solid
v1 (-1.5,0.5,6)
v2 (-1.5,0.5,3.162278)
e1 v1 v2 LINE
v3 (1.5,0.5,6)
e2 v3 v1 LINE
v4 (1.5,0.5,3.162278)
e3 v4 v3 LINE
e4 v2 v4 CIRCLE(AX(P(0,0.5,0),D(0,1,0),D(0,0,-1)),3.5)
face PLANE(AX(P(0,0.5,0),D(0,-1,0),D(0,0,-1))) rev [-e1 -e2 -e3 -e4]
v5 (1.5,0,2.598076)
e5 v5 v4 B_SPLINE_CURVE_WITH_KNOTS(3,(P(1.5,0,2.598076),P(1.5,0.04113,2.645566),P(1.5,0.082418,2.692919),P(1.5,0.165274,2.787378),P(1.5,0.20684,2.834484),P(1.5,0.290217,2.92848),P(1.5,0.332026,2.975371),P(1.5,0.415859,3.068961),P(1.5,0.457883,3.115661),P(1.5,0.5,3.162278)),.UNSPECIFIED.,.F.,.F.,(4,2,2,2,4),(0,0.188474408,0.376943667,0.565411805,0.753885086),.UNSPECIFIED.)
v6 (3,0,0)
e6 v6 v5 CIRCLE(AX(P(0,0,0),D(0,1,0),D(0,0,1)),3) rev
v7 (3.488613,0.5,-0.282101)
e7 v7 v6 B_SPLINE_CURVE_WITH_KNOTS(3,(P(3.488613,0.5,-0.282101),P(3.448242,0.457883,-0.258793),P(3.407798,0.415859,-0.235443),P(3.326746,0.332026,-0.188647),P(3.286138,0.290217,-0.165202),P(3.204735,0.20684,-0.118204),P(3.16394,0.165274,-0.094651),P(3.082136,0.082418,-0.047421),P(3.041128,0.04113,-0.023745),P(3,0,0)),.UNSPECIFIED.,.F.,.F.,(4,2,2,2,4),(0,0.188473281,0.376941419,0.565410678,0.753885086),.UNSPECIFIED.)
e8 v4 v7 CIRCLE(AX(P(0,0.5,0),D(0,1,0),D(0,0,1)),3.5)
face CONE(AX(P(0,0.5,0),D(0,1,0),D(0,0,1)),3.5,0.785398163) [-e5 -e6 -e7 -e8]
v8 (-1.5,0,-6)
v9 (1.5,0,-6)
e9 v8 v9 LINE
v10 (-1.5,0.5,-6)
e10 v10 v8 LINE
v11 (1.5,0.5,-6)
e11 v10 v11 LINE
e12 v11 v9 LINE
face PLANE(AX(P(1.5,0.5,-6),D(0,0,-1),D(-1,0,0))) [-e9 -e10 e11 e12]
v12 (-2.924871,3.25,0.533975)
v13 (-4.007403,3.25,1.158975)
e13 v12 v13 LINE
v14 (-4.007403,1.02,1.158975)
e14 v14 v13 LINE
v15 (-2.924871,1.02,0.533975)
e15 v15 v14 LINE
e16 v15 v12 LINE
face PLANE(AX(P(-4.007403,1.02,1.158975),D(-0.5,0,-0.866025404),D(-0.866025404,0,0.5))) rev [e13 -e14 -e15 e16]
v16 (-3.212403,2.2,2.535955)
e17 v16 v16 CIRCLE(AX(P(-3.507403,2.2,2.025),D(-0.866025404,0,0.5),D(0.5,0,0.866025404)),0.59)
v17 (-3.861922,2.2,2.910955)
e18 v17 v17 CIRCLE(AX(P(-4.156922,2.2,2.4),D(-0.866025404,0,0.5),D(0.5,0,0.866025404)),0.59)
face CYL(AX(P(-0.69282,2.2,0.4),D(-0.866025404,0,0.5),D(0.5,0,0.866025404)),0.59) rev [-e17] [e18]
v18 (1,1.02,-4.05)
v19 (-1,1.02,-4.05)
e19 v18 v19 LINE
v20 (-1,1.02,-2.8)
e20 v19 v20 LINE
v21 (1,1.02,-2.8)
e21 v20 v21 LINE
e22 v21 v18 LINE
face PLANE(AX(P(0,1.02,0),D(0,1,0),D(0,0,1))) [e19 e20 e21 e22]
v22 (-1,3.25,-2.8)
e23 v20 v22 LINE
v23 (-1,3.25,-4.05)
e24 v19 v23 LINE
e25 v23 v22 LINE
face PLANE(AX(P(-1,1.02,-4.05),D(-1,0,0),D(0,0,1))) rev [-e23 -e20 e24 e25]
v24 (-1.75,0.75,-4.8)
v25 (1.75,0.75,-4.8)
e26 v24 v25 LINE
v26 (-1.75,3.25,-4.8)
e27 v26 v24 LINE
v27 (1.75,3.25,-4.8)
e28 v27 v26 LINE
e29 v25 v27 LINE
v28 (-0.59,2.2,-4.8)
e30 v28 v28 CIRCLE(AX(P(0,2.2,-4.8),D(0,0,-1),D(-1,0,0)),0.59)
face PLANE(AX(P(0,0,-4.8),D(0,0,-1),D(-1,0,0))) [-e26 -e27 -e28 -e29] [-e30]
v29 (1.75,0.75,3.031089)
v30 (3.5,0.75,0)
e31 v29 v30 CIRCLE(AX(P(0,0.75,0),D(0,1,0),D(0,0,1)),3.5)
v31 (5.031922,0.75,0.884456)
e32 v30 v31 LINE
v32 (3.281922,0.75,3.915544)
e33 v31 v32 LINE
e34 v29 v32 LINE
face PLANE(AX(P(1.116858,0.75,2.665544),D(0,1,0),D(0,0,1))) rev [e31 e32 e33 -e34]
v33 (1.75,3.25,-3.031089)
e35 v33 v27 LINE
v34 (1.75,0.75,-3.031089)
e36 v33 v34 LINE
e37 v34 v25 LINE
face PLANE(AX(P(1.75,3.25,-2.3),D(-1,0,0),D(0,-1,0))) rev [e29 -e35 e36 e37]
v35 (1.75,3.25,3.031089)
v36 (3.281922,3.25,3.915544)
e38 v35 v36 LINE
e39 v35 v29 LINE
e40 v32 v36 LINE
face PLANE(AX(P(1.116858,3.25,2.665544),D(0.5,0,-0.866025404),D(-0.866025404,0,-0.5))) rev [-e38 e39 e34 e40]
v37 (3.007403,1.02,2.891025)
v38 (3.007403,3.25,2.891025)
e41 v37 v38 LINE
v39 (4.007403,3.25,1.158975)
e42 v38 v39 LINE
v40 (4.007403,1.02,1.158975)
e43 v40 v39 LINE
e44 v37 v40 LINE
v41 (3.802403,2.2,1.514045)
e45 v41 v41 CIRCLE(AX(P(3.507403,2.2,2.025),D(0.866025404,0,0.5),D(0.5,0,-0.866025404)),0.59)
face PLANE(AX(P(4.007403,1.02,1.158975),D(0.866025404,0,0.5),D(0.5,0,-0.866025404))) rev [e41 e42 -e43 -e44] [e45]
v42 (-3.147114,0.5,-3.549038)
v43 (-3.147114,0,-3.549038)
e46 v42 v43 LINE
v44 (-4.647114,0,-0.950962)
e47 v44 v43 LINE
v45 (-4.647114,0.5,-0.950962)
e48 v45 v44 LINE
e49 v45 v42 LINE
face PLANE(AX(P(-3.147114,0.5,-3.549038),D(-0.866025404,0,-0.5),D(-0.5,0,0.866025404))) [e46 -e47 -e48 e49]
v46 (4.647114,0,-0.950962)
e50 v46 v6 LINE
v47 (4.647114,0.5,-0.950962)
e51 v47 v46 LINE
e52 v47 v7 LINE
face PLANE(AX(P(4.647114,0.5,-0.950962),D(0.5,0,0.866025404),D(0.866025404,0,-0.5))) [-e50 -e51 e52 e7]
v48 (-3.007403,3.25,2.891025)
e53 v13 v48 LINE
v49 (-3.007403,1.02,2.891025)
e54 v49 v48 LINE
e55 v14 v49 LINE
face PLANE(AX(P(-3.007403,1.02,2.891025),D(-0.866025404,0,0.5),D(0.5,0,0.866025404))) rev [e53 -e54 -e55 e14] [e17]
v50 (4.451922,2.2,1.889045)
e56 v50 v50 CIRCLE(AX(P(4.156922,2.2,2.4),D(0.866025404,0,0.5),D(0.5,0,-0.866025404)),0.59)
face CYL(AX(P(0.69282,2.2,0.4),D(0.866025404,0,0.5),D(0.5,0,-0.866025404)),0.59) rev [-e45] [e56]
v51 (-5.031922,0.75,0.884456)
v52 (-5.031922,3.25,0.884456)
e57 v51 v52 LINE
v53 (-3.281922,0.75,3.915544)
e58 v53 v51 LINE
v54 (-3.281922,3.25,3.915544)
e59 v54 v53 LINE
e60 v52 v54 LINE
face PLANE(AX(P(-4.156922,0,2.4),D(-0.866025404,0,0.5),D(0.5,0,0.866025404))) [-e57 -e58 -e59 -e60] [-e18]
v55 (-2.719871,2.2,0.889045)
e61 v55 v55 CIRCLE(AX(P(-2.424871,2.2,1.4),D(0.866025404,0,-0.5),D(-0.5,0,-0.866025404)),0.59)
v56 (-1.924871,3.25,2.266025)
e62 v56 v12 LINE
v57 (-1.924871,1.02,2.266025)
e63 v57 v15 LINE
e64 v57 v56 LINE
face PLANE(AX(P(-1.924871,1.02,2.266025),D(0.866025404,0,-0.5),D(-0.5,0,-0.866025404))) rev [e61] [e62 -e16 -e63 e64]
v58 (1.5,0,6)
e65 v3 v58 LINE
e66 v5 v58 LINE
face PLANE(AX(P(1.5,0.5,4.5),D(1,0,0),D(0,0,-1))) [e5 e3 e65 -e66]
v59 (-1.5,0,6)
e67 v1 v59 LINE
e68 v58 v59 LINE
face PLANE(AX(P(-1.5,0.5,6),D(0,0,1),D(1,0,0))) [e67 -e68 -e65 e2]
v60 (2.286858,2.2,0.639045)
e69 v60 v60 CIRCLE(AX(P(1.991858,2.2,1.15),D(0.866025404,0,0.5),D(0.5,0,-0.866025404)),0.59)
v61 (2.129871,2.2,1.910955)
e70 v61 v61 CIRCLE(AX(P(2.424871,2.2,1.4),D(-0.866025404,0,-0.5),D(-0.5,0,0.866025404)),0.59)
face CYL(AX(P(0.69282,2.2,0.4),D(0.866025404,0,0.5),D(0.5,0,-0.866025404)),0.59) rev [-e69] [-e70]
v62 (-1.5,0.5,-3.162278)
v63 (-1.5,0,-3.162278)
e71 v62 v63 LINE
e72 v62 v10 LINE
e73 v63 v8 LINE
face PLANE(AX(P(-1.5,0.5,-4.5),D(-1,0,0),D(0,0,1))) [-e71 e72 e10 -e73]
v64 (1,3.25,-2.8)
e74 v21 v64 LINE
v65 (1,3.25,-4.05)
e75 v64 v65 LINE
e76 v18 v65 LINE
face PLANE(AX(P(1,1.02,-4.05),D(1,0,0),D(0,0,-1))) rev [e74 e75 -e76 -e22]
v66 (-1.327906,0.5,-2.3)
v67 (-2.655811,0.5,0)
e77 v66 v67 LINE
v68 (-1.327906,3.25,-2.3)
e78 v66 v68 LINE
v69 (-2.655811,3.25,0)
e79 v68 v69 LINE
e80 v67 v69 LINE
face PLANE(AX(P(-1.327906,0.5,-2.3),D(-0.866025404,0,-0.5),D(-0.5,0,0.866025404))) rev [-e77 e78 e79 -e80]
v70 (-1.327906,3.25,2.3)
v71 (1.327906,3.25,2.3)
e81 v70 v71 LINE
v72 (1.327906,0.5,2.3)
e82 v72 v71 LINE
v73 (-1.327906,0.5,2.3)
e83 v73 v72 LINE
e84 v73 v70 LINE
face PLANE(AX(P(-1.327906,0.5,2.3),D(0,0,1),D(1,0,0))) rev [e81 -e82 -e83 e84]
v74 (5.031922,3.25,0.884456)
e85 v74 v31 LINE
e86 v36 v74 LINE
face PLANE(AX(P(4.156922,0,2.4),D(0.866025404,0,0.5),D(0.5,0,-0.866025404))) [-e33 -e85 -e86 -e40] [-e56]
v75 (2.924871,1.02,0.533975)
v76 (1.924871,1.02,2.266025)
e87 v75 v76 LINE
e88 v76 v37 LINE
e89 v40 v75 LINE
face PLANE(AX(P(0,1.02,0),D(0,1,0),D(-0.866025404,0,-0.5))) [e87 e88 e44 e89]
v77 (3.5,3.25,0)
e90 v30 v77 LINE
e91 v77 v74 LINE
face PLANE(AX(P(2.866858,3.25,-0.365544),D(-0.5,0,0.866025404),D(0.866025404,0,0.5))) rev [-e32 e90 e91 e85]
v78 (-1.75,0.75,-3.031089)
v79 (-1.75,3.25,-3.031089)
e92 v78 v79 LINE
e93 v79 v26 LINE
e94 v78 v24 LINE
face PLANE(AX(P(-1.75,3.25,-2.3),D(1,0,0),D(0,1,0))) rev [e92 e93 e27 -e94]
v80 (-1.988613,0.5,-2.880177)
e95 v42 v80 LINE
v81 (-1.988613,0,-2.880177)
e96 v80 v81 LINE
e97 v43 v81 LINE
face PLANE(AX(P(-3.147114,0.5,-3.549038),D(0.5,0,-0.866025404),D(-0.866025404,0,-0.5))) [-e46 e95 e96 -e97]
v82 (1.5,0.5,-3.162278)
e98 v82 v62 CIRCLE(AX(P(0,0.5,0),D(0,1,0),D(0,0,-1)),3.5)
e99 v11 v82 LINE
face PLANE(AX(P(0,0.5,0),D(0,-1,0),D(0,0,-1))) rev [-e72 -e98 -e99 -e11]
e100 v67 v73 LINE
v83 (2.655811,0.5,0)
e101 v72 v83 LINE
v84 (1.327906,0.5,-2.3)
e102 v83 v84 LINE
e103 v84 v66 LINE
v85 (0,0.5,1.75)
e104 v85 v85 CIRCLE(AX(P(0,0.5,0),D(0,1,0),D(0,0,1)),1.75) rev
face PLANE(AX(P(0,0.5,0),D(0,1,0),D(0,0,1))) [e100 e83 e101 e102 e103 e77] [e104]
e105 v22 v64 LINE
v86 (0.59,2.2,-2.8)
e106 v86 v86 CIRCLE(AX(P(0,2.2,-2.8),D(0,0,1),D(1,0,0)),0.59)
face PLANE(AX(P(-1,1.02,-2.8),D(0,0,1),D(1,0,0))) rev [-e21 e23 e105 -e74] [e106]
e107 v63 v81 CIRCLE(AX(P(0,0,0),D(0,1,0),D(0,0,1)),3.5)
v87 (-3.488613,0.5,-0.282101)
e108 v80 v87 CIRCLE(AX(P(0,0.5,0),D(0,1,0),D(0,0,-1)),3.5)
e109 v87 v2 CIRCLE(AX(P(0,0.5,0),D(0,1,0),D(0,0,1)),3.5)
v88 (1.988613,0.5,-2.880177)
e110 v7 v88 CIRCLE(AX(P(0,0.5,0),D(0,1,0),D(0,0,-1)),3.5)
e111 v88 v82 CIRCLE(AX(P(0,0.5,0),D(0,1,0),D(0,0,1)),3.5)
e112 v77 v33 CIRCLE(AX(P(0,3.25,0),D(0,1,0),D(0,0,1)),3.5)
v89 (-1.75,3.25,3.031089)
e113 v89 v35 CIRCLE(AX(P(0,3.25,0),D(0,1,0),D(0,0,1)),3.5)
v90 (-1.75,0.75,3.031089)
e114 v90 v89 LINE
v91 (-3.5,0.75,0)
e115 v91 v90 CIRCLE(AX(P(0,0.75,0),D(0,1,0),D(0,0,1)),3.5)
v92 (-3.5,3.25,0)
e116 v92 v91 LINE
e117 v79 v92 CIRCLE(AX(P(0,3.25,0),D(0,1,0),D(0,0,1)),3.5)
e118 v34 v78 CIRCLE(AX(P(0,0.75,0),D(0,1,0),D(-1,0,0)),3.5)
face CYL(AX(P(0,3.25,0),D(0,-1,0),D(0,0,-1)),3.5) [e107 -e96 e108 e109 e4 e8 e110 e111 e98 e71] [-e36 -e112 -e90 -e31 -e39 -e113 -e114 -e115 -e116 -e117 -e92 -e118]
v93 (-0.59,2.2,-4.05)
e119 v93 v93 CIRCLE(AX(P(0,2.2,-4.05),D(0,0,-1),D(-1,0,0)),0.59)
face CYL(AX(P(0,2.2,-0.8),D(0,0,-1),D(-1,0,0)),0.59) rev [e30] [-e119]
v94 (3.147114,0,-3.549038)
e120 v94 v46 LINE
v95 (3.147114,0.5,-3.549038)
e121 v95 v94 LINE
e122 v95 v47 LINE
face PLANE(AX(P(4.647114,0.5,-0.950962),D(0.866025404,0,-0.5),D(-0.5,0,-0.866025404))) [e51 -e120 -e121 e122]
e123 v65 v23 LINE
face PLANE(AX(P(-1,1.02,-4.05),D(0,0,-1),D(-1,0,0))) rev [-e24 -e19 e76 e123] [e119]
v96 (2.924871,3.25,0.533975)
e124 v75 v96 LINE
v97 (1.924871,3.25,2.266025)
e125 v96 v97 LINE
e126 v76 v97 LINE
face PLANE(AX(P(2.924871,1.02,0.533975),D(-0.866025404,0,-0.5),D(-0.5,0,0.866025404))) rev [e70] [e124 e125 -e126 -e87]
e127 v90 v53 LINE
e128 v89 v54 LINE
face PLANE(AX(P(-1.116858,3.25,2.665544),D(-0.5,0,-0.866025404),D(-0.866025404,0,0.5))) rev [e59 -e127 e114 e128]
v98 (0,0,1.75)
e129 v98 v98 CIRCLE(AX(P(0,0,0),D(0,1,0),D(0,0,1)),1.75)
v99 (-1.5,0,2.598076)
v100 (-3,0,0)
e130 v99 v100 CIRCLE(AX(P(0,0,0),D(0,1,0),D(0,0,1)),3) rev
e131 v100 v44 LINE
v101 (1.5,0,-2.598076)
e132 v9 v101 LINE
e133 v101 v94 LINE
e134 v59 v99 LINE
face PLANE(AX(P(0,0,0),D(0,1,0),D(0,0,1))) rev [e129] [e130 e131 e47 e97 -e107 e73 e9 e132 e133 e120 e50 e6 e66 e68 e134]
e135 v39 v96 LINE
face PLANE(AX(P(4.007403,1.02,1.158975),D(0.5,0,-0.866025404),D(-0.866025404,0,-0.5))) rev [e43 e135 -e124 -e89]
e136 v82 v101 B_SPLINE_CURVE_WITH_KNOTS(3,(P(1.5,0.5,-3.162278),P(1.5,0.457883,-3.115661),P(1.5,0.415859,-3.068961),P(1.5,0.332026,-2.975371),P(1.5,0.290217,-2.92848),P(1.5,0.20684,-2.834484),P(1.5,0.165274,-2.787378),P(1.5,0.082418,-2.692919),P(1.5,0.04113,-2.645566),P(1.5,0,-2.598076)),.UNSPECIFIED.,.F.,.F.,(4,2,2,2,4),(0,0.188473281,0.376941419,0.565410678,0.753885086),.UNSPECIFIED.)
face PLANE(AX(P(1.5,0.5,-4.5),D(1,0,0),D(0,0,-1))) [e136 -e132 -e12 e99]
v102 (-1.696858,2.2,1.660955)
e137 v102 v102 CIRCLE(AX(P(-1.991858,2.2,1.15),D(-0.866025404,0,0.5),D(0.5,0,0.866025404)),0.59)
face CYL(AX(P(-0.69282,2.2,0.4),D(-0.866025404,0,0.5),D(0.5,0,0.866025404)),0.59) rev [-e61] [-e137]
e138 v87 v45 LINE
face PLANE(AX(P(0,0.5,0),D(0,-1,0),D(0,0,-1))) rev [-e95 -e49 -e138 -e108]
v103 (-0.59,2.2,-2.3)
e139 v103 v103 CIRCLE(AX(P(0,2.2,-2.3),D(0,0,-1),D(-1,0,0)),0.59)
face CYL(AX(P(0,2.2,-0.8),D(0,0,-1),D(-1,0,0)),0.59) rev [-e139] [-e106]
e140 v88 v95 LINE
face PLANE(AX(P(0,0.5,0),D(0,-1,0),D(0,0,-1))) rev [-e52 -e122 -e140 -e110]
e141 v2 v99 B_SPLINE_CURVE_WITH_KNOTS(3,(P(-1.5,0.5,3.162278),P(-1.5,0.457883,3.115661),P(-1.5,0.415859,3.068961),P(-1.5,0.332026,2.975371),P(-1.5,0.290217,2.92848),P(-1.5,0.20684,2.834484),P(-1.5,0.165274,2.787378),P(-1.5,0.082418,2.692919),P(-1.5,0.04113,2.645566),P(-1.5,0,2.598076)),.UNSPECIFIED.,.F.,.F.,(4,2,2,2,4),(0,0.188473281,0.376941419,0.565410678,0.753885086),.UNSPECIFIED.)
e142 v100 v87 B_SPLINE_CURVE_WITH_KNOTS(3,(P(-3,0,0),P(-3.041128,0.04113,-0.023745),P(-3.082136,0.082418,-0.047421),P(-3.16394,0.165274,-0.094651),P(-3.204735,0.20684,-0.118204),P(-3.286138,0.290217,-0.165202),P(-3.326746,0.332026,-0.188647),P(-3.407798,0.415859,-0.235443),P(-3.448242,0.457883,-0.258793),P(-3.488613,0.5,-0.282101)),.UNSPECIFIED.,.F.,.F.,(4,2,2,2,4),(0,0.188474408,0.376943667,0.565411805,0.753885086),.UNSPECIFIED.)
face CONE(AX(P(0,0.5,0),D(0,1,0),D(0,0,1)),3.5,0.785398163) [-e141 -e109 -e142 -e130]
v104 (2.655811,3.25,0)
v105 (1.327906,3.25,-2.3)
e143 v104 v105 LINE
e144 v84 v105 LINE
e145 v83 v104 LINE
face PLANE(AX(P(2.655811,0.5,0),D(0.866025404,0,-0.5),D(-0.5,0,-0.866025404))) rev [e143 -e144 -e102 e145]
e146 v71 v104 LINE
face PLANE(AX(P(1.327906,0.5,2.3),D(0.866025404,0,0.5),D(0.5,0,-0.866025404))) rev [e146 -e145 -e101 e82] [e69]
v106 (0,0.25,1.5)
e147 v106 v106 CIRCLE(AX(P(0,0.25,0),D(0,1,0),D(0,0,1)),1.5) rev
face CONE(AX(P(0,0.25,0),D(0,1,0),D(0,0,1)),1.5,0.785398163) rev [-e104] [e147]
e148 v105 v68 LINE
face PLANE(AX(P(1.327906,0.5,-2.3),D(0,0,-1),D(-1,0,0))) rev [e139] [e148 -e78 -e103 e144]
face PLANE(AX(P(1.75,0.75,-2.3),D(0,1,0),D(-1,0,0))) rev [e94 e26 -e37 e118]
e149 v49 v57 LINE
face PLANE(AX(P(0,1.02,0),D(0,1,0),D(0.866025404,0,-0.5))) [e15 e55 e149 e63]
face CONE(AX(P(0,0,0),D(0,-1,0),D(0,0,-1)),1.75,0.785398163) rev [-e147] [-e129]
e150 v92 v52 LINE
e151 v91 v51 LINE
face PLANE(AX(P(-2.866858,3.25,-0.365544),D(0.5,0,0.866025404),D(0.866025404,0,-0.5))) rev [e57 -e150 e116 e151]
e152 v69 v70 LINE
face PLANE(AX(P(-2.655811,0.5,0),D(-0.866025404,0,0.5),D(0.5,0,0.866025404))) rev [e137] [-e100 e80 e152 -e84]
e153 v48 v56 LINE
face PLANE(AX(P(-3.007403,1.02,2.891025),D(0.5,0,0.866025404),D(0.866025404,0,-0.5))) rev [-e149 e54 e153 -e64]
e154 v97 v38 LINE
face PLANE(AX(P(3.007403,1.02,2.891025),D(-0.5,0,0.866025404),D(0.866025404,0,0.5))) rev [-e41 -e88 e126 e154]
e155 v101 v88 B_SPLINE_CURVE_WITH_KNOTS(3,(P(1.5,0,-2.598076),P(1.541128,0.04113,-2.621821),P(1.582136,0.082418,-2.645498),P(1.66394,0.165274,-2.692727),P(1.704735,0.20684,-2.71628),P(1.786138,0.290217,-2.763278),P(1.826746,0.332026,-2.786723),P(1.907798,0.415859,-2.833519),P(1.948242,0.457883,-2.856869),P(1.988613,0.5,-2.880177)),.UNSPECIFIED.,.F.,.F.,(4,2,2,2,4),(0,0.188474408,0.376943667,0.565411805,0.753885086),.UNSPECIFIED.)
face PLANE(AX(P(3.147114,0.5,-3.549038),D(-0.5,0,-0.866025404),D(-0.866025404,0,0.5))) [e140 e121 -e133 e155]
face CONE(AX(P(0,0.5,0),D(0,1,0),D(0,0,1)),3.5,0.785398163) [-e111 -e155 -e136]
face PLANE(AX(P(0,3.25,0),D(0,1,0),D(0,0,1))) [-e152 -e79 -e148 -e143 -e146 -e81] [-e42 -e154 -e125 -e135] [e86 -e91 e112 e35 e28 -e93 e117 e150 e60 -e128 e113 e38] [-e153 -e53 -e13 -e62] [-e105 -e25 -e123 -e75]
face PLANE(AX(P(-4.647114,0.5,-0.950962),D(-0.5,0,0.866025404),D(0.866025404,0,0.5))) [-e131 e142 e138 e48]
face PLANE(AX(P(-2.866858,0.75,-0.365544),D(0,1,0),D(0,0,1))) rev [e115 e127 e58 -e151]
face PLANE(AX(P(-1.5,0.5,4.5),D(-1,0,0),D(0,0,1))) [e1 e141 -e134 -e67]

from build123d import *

# Parameters (mm, degrees)
SKETCH1_R           = 3.5
BOSS_EXTRUDE1_DEPTH = 3.25
CUT_EXTRUDE1_DEPTH  = 2.75
SKETCH3_R           = 1.5
CUT_EXTRUDE2_DEPTH  = 6.662375826
BOSS_EXTRUDE6_DEPTH = 0.5
BOSS_EXTRUDE4_START = -2
SKETCH6_W           = 3.5
SKETCH6_H           = 2.5
BOSS_EXTRUDE4_DEPTH = 2.5
SKETCH7_W           = 2
SKETCH7_H           = 1.25
CUT_EXTRUDE3_DEPTH  = 2.23
SKETCH8_R           = 0.59
CUT_EXTRUDE4_DEPTH  = 4
CHAMFER3_SIZE       = 0.5
CIRPATTERN1_COUNT   = 3
CHAMFER4_SIZE       = 0.25


# Some blends are built 0.0001 mm under size
with BuildPart() as part:
    # Sketch1 → Boss-Extrude1 (new body)
    with BuildSketch(Plane(origin=(0, 0, 0), x_dir=(1, 0, 0), z_dir=(0, 1, 0))):
        with Locations(Location((0, 0, 0), (0, 0, 90))):
            Circle(SKETCH1_R)
    extrude(amount=BOSS_EXTRUDE1_DEPTH)

    # Sketch2 → Cut-Extrude1 (cut)
    with BuildSketch(Plane(origin=(0, 3.25, 0), x_dir=(1, 0, 0), z_dir=(0, 1, 0))):
        Polygon((1.327905619, -2.3), (2.655811238, 0), (1.327905619, 2.3), (-1.327905619, 2.3), (-2.655811238, 0), (-1.327905619, -2.3), align=None)
    extrude(amount=-CUT_EXTRUDE1_DEPTH, mode=Mode.SUBTRACT)

    # Sketch3 → Cut-Extrude2 (cut, through all)
    with BuildSketch(Plane(origin=(0, 0.5, 0), x_dir=(1, 0, 0), z_dir=(0, 1, 0))):
        with Locations(Location((0, 0, 0), (0, 0, 270))):
            Circle(SKETCH3_R)
    extrude(amount=-CUT_EXTRUDE2_DEPTH, mode=Mode.SUBTRACT)

    # Sketch4 → Boss-Extrude6 (add)
    with BuildSketch(Plane.XZ):
        with BuildLine():
            Line((-1.5, 4.5), (-1.5, 3.16227766))
            ThreePointArc((-1.5, 3.16227766), (0, 3.5), (1.5, 3.16227766))
            Line((1.5, 3.16227766), (1.5, 4.5))
            Line((1.5, 4.5), (1.5, 6))
            Line((1.5, 6), (-1.5, 6))
            Line((-1.5, 6), (-1.5, 4.5))
        make_face()
        with BuildLine():
            Line((4.647114317, -0.950961894), (3.488612788, -0.282100724))
            ThreePointArc((3.488612788, -0.282100724), (3.031088913, -1.75), (1.988612788, -2.880176936))
            Line((1.988612788, -2.880176936), (3.147114317, -3.549038106))
            Line((3.147114317, -3.549038106), (4.647114317, -0.950961894))
        make_face()
        with BuildLine():
            Line((-3.147114317, -3.549038106), (-1.988612788, -2.880176936))
            ThreePointArc((-1.988612788, -2.880176936), (-3.031088913, -1.75), (-3.488612788, -0.282100724))
            Line((-3.488612788, -0.282100724), (-4.647114317, -0.950961894))
            Line((-4.647114317, -0.950961894), (-3.147114317, -3.549038106))
        make_face()
        with BuildLine():
            Line((1.5, -4.5), (1.5, -3.16227766))
            ThreePointArc((1.5, -3.16227766), (0, -3.5), (-1.5, -3.16227766))
            Line((-1.5, -3.16227766), (-1.5, -4.5))
            Line((-1.5, -4.5), (-1.5, -6))
            Line((-1.5, -6), (1.5, -6))
            Line((1.5, -6), (1.5, -4.5))
        make_face()
    extrude(amount=-BOSS_EXTRUDE6_DEPTH)

    # Sketch6 → Boss-Extrude4 (add)
    with BuildSketch(Plane.XY.offset(-2.8).offset(BOSS_EXTRUDE4_START)):
        with Locations((0, 2)):
            Rectangle(SKETCH6_W, SKETCH6_H)
    boss_extrude4 = extrude(amount=BOSS_EXTRUDE4_DEPTH)

    # Sketch7 → Cut-Extrude3 (cut)
    with BuildSketch(Plane(origin=(0, 3.25, 0), x_dir=(1, 0, 0), z_dir=(0, 1, 0))):
        with Locations((0, 3.425)):
            Rectangle(SKETCH7_W, SKETCH7_H)
    cut_extrude3 = extrude(amount=-CUT_EXTRUDE3_DEPTH, mode=Mode.SUBTRACT)

    # Sketch8 → Cut-Extrude4 (cut)
    with BuildSketch(Plane(origin=(0, 0, -4.8), x_dir=(-1, 0, 0), z_dir=(0, 0, -1))):
        with Locations((0, 2.2)):
            Circle(SKETCH8_R)
    cut_extrude4 = extrude(amount=-CUT_EXTRUDE4_DEPTH, mode=Mode.SUBTRACT)

    # Chamfer3
    # the kernel refuses this chamfer: 0.5 mm, written as the material it takes off along each edge
    with BuildSketch(Plane(origin=(0, 0, 0), x_dir=(-0.90124662040542, 0, -0.4333065072299383), z_dir=(0.4333065072299383, 0, -0.90124662040542))) as chamfer3_piece_1_section:
        Polygon((3.5, CHAMFER3_SIZE), (3.5 - CHAMFER3_SIZE, 0), (3.5, 0), align=None)
    chamfer3_piece_1 = revolve(axis=Axis((0, 0, 0), (0, 1, 0)), revolution_arc=111.355166333, mode=Mode.PRIVATE)
    chamfer3_piece_1 = split(chamfer3_piece_1, bisect_by=Plane(origin=(-2.813419939, 0.5, 1.624328759), z_dir=(0, -1, 0)), keep=Keep.TOP, mode=Mode.PRIVATE)
    chamfer3_piece_1 = split(chamfer3_piece_1, bisect_by=Plane(origin=(-2.15670997, 0.237200346, 0.486873726), z_dir=(-0.5000000000000004, 0, 0.8660254037844385)), keep=Keep.TOP, mode=Mode.PRIVATE)
    chamfer3_piece_1 = split(chamfer3_piece_1, bisect_by=Plane(origin=(-1.5, 0.237200346, 1.624328759), z_dir=(-1, 0, 0)), keep=Keep.TOP, mode=Mode.PRIVATE)
    add(chamfer3_piece_1, mode=Mode.SUBTRACT)
    with BuildSketch(Plane(origin=(0, 0, 0), x_dir=(0.8258293731996098, 0, -0.5639200708972323), z_dir=(0.5639200708972323, 0, 0.8258293731996098))) as chamfer3_piece_2_section:
        Polygon((3.5, CHAMFER3_SIZE), (3.5 - CHAMFER3_SIZE, 0), (3.5, 0), align=None)
    chamfer3_piece_2 = revolve(axis=Axis((0, 0, 0), (0, 1, 0)), revolution_arc=51.345334665, mode=Mode.PRIVATE)
    chamfer3_piece_2 = split(chamfer3_piece_2, bisect_by=Plane(origin=(1.689638758, 0.5, -2.926540175), z_dir=(0, -1, 0)), keep=Keep.TOP, mode=Mode.PRIVATE)
    chamfer3_piece_2 = split(chamfer3_piece_2, bisect_by=Plane(origin=(1.784458137, 0.189171232, -2.762308193), z_dir=(-0.5000000000000001, 0, -0.8660254037844386)), keep=Keep.TOP, mode=Mode.PRIVATE)
    chamfer3_piece_2 = split(chamfer3_piece_2, bisect_by=Plane(origin=(1.5, 0.189171232, -2.926540175), z_dir=(1, 0, 0)), keep=Keep.TOP, mode=Mode.PRIVATE)
    add(chamfer3_piece_2, mode=Mode.SUBTRACT)
    with BuildSketch(Plane(origin=(0, 0, 0), x_dir=(0.0753688673164782, 0, 0.9971557219609338), z_dir=(-0.9971557219609338, 0, 0.0753688673164782))) as chamfer3_piece_3_section:
        Polygon((3.5, CHAMFER3_SIZE), (3.5 - CHAMFER3_SIZE, 0), (3.5, 0), align=None)
    chamfer3_piece_3 = revolve(axis=Axis((0, 0, 0), (0, 1, 0)), revolution_arc=111.355166333, mode=Mode.PRIVATE)
    chamfer3_piece_3 = split(chamfer3_piece_3, bisect_by=Plane(origin=(2.813419939, 0.5, 1.624328759), z_dir=(0, -1, 0)), keep=Keep.TOP, mode=Mode.PRIVATE)
    chamfer3_piece_3 = split(chamfer3_piece_3, bisect_by=Plane(origin=(1.5, 0.237200346, 1.624328759), z_dir=(1, 0, 0)), keep=Keep.TOP, mode=Mode.PRIVATE)
    chamfer3_piece_3 = split(chamfer3_piece_3, bisect_by=Plane(origin=(2.15670997, 0.237200346, 0.486873726), z_dir=(0.4999999999999997, 0, 0.8660254037844388)), keep=Keep.TOP, mode=Mode.PRIVATE)
    add(chamfer3_piece_3, mode=Mode.SUBTRACT)

    # CirPattern1: Boss-Extrude4, Cut-Extrude3, Cut-Extrude4 ×3 about axis
    cirpattern1_axis = Axis((0, 0, 0), (0, 1, 0))
    add([boss_extrude4.rotate(cirpattern1_axis, i * 360 / CIRPATTERN1_COUNT) for i in range(1, CIRPATTERN1_COUNT)])
    add([cut_extrude3.rotate(cirpattern1_axis, i * 360 / CIRPATTERN1_COUNT) for i in range(1, CIRPATTERN1_COUNT)], mode=Mode.SUBTRACT)
    add([cut_extrude4.rotate(cirpattern1_axis, i * 360 / CIRPATTERN1_COUNT) for i in range(1, CIRPATTERN1_COUNT)], mode=Mode.SUBTRACT)

    # Chamfer4
    chamfer4_edges = [part.edges().sort_by_distance(p)[0] for p in [
        (0, 0, -1.5),
        (0, 0.5, -1.5),
    ]]
    chamfer(chamfer4_edges, length=CHAMFER4_SIZE - 0.0001)  # a hair under: the kernel refuses the full size


solid = part.part
